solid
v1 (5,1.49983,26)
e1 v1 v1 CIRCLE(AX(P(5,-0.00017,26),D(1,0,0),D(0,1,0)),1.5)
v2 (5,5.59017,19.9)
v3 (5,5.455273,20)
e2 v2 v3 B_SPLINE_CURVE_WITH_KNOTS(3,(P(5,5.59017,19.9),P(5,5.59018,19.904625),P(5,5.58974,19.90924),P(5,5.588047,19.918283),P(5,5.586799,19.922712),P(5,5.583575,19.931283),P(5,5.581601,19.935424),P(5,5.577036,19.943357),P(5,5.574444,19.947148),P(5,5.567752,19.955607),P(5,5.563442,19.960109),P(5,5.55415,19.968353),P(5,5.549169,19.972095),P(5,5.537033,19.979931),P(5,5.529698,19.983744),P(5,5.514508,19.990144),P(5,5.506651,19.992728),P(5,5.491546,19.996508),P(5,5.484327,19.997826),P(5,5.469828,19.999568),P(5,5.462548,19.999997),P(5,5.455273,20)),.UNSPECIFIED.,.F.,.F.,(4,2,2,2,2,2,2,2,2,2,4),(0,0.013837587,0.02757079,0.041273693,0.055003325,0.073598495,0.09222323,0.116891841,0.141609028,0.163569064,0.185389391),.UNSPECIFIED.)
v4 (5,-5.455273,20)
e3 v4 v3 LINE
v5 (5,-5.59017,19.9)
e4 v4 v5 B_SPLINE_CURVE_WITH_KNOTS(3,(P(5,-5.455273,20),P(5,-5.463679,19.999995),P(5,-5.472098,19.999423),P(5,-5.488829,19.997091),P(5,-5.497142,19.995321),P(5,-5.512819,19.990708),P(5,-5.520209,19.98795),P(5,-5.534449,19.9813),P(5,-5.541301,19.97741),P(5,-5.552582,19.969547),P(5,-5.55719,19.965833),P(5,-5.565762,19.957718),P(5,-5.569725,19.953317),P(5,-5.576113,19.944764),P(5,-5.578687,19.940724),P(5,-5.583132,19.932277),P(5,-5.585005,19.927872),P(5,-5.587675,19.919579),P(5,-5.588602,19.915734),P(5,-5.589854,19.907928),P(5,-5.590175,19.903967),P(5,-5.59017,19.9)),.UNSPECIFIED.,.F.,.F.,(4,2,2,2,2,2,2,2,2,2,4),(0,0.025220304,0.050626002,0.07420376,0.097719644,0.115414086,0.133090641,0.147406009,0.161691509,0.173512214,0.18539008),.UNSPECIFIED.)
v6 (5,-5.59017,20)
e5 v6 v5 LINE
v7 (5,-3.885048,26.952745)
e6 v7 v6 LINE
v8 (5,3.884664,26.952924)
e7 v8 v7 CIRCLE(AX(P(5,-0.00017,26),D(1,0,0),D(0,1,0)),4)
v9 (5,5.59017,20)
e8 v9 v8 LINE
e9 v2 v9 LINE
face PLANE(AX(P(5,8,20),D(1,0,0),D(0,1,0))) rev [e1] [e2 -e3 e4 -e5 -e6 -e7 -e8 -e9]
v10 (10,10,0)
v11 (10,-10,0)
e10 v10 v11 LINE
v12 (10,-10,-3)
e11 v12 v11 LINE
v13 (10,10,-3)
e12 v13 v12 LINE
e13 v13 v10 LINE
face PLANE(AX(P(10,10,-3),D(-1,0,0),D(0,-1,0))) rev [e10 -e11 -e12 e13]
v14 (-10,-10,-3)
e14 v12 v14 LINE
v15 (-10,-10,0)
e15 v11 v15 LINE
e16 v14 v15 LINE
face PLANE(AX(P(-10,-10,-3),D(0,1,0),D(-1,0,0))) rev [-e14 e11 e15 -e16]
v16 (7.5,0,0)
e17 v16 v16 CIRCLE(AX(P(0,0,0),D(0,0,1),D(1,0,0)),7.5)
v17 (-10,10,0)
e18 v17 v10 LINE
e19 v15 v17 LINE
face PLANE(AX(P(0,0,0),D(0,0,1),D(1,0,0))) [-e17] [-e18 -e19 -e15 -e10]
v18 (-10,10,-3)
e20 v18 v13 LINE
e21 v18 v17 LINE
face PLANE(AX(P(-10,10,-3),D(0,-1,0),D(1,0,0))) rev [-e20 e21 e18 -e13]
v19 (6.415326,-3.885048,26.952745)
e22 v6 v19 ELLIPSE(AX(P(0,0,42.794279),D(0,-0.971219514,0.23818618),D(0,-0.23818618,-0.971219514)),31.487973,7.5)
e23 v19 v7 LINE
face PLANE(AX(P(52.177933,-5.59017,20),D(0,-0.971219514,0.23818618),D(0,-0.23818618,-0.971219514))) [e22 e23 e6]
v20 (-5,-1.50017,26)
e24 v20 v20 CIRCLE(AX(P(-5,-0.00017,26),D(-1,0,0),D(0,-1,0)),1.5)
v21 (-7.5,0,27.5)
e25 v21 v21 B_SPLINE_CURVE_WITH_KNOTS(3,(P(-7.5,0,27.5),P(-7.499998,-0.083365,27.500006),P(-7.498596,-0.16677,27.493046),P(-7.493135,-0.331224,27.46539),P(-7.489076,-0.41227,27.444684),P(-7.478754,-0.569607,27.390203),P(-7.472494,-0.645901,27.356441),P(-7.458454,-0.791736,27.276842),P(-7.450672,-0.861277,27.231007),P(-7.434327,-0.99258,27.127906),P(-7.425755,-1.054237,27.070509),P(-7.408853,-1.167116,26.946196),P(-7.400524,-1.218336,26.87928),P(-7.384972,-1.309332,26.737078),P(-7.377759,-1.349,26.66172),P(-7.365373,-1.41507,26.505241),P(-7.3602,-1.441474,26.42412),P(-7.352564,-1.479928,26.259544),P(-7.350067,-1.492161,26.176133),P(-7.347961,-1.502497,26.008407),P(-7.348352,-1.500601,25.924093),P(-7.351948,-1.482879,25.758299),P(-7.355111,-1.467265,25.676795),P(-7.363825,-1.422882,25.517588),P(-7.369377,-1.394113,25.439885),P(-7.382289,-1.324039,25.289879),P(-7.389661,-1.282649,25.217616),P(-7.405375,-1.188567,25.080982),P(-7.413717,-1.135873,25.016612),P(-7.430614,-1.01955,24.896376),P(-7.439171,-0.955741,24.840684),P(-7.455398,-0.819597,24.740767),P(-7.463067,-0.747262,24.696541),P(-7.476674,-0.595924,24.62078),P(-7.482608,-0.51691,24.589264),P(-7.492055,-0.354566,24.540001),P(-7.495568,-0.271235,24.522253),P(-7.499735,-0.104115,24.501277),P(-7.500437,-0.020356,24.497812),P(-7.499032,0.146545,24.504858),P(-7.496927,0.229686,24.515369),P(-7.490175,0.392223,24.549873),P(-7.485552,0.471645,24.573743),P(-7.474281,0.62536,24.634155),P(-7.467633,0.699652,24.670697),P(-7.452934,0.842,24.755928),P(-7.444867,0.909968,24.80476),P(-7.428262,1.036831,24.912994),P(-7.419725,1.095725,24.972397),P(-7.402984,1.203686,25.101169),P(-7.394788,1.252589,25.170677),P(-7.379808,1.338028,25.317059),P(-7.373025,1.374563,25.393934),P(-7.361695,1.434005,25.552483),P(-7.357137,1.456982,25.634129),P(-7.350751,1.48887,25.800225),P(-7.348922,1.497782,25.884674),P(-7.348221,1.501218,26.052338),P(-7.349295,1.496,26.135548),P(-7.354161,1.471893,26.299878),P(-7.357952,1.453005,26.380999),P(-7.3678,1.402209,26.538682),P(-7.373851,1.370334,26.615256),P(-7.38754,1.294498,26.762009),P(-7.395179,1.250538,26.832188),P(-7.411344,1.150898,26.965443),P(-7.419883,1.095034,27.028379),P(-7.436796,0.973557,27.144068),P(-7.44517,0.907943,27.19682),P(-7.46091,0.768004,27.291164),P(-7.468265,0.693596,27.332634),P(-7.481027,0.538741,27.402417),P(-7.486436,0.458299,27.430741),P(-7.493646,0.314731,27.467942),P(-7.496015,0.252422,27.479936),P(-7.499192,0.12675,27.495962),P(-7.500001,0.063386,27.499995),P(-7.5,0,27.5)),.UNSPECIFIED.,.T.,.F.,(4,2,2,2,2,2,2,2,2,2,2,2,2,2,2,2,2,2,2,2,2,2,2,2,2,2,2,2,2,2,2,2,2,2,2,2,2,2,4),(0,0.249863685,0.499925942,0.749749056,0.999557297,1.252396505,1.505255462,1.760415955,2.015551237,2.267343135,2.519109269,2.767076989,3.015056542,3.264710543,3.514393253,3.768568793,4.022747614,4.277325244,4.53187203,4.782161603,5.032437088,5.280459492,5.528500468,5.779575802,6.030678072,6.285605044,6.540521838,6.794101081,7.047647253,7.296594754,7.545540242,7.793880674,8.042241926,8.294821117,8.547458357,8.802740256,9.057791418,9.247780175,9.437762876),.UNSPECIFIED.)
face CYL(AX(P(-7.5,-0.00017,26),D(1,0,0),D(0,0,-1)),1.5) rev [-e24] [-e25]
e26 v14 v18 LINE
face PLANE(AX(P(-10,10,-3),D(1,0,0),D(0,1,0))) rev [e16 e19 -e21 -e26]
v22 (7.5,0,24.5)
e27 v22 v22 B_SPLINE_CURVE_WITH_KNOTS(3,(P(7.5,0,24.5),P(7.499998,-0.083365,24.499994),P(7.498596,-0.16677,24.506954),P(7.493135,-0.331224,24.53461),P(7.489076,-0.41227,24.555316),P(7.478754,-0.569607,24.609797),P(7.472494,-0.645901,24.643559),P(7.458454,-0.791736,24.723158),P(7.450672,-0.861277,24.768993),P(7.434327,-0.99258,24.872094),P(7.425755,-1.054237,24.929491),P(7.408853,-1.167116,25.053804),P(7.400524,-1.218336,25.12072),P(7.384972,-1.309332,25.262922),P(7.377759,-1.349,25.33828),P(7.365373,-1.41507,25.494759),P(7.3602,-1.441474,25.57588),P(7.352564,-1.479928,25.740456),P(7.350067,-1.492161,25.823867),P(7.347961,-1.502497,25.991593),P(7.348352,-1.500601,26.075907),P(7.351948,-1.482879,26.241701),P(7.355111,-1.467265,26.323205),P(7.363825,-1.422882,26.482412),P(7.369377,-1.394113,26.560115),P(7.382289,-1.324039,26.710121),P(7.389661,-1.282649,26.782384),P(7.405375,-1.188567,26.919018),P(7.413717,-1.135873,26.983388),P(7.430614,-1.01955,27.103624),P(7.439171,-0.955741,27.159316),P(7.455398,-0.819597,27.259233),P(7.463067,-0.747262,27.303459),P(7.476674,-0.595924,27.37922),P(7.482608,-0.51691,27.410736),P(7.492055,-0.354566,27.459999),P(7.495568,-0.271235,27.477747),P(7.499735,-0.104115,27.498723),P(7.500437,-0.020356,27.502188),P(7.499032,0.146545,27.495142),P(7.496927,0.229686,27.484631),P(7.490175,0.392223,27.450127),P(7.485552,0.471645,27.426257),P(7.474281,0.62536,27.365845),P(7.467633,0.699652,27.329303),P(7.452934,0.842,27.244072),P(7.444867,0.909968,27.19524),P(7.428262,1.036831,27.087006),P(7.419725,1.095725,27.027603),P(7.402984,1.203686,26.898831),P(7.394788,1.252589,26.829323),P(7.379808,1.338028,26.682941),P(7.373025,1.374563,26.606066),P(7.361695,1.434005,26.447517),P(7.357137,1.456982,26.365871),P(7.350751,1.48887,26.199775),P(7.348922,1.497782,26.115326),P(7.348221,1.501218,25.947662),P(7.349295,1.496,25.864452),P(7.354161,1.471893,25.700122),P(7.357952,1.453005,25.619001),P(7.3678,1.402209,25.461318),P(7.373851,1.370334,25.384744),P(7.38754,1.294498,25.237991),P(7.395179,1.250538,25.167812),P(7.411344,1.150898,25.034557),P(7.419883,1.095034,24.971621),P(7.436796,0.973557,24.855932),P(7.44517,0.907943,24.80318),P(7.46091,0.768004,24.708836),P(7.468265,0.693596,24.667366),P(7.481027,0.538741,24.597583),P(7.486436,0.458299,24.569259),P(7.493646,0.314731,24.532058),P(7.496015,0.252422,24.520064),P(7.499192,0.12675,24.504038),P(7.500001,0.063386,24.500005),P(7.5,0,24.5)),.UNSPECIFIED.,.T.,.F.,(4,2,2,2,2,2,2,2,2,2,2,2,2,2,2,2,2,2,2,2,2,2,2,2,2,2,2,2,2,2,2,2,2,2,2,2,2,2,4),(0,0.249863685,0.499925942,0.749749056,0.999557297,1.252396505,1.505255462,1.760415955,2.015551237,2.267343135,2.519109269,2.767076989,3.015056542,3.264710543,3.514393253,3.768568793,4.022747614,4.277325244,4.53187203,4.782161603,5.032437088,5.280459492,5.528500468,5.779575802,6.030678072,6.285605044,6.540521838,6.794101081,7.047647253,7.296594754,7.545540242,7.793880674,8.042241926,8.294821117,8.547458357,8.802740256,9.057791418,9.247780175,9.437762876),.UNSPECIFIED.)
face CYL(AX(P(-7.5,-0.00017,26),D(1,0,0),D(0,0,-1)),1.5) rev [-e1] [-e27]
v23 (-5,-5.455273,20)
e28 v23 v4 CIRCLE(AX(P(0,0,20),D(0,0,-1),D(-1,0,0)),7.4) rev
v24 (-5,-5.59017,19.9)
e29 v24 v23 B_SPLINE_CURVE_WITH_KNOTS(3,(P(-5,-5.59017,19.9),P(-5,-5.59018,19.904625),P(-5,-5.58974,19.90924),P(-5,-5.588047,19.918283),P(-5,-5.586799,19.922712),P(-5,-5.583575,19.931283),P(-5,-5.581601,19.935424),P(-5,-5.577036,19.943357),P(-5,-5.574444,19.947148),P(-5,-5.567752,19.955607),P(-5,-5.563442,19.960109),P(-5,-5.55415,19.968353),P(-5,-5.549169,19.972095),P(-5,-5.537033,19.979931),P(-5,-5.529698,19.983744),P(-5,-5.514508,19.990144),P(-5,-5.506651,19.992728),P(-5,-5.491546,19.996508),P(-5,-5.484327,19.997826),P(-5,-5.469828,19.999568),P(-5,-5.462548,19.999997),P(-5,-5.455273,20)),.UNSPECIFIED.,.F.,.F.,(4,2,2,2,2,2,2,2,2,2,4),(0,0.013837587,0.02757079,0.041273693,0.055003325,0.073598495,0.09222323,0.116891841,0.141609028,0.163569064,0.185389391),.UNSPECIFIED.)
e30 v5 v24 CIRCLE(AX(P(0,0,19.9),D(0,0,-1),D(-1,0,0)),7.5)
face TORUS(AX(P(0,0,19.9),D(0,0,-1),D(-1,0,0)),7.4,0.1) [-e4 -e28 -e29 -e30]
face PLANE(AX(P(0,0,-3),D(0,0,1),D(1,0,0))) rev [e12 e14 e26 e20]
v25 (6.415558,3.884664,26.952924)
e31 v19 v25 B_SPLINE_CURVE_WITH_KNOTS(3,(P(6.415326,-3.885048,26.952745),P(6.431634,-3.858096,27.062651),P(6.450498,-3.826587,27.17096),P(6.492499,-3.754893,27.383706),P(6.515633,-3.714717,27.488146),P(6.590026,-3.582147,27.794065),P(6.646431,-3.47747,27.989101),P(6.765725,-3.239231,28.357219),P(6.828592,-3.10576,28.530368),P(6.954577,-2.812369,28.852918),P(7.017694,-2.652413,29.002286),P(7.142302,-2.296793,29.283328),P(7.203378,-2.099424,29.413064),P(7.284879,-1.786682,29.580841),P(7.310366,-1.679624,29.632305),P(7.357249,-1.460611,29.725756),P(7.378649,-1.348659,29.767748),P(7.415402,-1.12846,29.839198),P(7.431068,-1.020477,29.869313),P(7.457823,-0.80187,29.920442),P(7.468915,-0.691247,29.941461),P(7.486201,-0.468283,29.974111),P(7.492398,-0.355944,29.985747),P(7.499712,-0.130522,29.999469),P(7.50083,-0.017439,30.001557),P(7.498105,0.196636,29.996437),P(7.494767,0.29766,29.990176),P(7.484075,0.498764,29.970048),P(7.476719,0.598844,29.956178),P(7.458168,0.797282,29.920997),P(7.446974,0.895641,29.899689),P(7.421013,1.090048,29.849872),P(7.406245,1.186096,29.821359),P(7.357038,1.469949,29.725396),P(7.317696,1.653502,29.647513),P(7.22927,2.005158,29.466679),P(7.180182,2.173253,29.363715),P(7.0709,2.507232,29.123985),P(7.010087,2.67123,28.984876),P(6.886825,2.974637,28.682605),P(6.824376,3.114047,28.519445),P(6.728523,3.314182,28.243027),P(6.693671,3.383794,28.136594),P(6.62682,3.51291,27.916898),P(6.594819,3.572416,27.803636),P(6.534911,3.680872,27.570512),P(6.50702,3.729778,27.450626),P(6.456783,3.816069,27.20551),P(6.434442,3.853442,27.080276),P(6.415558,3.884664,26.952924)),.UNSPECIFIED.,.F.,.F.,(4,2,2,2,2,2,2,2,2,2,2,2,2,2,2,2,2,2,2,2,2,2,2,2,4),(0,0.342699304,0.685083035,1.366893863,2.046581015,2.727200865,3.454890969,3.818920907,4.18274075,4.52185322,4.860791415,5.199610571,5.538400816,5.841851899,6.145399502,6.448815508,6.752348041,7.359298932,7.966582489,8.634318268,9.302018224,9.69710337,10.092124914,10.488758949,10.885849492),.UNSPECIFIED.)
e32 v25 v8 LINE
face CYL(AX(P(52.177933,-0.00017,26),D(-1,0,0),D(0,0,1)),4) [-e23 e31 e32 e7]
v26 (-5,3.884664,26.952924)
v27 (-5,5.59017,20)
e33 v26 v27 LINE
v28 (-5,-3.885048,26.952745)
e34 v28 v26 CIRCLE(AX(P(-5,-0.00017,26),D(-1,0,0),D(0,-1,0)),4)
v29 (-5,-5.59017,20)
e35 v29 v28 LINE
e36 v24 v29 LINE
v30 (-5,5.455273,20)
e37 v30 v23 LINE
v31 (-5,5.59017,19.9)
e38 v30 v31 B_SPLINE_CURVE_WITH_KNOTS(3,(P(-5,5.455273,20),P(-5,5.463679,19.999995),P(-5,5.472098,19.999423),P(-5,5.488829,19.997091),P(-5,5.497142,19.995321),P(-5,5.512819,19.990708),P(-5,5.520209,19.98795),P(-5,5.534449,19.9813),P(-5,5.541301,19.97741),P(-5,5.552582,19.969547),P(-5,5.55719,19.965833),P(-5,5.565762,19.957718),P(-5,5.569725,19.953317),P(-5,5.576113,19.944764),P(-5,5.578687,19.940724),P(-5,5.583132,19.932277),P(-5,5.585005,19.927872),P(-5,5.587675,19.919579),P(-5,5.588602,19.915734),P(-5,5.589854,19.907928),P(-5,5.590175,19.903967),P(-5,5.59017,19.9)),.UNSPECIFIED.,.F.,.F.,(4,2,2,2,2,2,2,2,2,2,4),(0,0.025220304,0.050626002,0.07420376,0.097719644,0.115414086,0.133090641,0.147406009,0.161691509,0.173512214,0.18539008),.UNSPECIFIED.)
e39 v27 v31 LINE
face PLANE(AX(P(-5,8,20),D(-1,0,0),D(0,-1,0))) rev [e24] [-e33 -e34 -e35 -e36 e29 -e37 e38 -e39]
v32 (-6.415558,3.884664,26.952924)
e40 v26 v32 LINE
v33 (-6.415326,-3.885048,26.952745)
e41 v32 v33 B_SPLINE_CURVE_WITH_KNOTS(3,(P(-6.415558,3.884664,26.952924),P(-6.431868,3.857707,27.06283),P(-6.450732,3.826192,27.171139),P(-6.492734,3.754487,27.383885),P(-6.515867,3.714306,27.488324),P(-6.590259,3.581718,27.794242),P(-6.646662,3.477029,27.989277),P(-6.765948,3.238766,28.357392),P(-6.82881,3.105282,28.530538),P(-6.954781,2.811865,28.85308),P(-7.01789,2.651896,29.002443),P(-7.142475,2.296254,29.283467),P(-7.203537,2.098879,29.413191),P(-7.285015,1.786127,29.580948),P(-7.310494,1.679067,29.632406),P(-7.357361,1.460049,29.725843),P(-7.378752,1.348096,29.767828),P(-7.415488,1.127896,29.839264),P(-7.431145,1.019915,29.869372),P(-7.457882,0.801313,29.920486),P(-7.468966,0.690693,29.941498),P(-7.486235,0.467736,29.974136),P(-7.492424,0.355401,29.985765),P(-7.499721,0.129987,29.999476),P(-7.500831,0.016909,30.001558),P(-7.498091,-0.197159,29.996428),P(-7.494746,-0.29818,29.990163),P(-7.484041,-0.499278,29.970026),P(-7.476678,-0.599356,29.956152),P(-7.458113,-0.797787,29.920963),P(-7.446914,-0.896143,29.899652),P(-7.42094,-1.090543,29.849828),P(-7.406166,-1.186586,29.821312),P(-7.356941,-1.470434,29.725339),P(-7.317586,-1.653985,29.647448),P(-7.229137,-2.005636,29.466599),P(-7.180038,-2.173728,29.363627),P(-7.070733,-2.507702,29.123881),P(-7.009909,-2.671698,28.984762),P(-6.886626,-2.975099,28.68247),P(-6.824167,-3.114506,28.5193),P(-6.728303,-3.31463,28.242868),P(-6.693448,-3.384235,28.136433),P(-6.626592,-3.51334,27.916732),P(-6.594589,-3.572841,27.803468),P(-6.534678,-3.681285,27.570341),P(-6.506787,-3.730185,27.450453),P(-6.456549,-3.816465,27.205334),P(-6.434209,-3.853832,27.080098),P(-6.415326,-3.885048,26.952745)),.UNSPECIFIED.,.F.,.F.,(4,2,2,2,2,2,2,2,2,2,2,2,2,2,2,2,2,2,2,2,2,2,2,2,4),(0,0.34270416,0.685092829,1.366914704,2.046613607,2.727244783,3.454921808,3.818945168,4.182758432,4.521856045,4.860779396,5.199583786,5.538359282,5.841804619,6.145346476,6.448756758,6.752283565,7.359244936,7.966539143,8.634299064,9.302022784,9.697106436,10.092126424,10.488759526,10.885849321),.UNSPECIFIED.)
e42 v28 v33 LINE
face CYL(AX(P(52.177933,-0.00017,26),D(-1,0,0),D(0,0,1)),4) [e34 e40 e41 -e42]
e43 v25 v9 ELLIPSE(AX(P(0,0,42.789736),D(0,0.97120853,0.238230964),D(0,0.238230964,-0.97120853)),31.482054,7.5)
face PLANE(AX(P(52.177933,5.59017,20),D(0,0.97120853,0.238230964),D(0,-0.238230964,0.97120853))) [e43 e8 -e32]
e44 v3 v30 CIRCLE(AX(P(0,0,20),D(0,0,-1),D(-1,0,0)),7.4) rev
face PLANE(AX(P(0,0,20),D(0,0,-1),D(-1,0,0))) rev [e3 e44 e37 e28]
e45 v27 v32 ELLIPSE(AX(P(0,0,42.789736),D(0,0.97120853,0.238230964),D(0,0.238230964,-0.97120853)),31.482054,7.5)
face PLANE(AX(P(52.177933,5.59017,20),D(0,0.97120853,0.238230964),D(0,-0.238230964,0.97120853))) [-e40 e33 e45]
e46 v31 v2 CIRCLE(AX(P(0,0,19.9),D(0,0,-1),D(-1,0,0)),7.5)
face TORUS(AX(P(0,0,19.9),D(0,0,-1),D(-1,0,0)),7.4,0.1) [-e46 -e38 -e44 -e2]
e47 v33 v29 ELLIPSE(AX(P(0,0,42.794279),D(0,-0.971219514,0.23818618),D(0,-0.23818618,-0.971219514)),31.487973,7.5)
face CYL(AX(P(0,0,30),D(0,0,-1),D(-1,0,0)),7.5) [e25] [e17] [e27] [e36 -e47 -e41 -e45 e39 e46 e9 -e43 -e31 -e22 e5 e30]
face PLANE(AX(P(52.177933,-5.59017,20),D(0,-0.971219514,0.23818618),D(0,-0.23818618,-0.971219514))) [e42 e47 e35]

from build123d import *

# Parameters (mm, degrees)
SKETCH1_R               = 7.5
BOSS_EXTRUDE1_DEPTH     = 30
SKETCH3_W               = 10
SKETCH3_H               = 16
CUT_EXTRUDE2_DEPTH      = 10
CUT_EXTRUDE3_DEPTH      = 32.819805153
CUT_EXTRUDE3_DEPTH_BACK = 32.819805153
CUT_EXTRUDE4_DEPTH      = 32.819805295
CUT_EXTRUDE4_DEPTH_BACK = 32.819805295
SKETCH5_R               = 1.5
FILLET1_R               = 0.1
SKETCH6_W               = 20
SKETCH6_H               = 20
BOSS_EXTRUDE2_DEPTH     = 3


with BuildPart() as part:
    # Sketch1 → Boss-Extrude1 (new body)
    with BuildSketch(Plane.XY):
        Circle(SKETCH1_R)
    extrude(amount=BOSS_EXTRUDE1_DEPTH)

    # Sketch3 → Cut-Extrude2 (cut)
    with BuildSketch(Plane.XY.offset(30)):
        Rectangle(SKETCH3_W, SKETCH3_H)
    extrude(amount=-CUT_EXTRUDE2_DEPTH, mode=Mode.SUBTRACT)

    # Sketch4 → Cut-Extrude3 (cut, two sides: drawn at the far end of the back side and taken through both)
    with BuildSketch(Plane(origin=(0, 0, 0), x_dir=(0, 0, -1), z_dir=(1, 0, 0)).offset(-CUT_EXTRUDE3_DEPTH_BACK)):
        with BuildLine():
            Line((-20, 67.5), (-20, 7.5))
            Line((-20, 7.5), (-20, 5.590169944))
            Line((-20, 5.590169944), (-26.952923855, 3.884664175))
            ThreePointArc((-26.952923855, 3.884664175), (-29.999999999, -0.000262165), (-26.952744721, -3.885047998))
            Line((-26.952744721, -3.885047998), (-20, -5.590169944))
            Line((-20, -5.590169944), (-20, -7.5))
            Line((-20, -7.5), (-20, -67.5))
            Line((-20, -67.5), (-140, -67.5))
            Line((-140, -67.5), (-140, 67.5))
            Line((-140, 67.5), (-20, 67.5))
        make_face()
    extrude(amount=CUT_EXTRUDE3_DEPTH + CUT_EXTRUDE3_DEPTH_BACK, mode=Mode.SUBTRACT)

    # Sketch5 → Cut-Extrude4 (cut, two sides: drawn at the far end of the back side and taken through both)
    with BuildSketch(Plane(origin=(0, 0, 0), x_dir=(0, 0, -1), z_dir=(1, 0, 0)).offset(-CUT_EXTRUDE4_DEPTH_BACK)):
        with Locations(Location((-26, -0.000169944, 0), (0, 0, 0.006491373))):
            Circle(SKETCH5_R)
    extrude(amount=CUT_EXTRUDE4_DEPTH + CUT_EXTRUDE4_DEPTH_BACK, mode=Mode.SUBTRACT)

    # Fillet1
    # the kernel refuses this fillet: 0.1 mm, written as the material it takes off along each edge
    with BuildSketch(Plane(origin=(0, 0, 20), x_dir=(0.6911452834399253, -0.7227158481580055, 0), z_dir=(0.7227158481580055, 0.6911452834399253, 0))) as fillet1_piece_1_section:
        with BuildLine():
            CenterArc((7.5 - FILLET1_R, FILLET1_R), FILLET1_R, 270, 90)
            Line((7.5 - FILLET1_R, 0), (7.5, 0))
            Line((7.5, 0), (7.5, FILLET1_R))
        make_face()
    fillet1_piece_1 = revolve(axis=Axis((0, 0, 20), (0, 0, -1)), revolution_arc=87.441672972, mode=Mode.PRIVATE)
    fillet1_piece_1 = split(fillet1_piece_1, bisect_by=Plane(origin=(5, -5.569278589, 19.983070115), z_dir=(-1, 0, 0)), keep=Keep.TOP, mode=Mode.PRIVATE)
    fillet1_piece_1 = split(fillet1_piece_1, bisect_by=Plane(origin=(-5, -5.569278589, 19.983070115), z_dir=(1, 0, 0)), keep=Keep.TOP, mode=Mode.PRIVATE)
    add(fillet1_piece_1, mode=Mode.SUBTRACT)
    with BuildSketch(Plane(origin=(0, 0, 20), x_dir=(-0.6911452834399255, 0.7227158481580054, 0), z_dir=(-0.7227158481580054, -0.6911452834399255, 0))) as fillet1_piece_2_section:
        with BuildLine():
            CenterArc((7.5 - FILLET1_R, FILLET1_R), FILLET1_R, 270, 90)
            Line((7.5 - FILLET1_R, 0), (7.5, 0))
            Line((7.5, 0), (7.5, FILLET1_R))
        make_face()
    fillet1_piece_2 = revolve(axis=Axis((0, 0, 20), (0, 0, -1)), revolution_arc=87.441672972, mode=Mode.PRIVATE)
    fillet1_piece_2 = split(fillet1_piece_2, bisect_by=Plane(origin=(5, 5.569279486, 19.983069507), z_dir=(-1, 0, 0)), keep=Keep.TOP, mode=Mode.PRIVATE)
    fillet1_piece_2 = split(fillet1_piece_2, bisect_by=Plane(origin=(-5, 5.569279486, 19.983069507), z_dir=(1, 0, 0)), keep=Keep.TOP, mode=Mode.PRIVATE)
    add(fillet1_piece_2, mode=Mode.SUBTRACT)

    # Sketch6 → Boss-Extrude2 (add)
    with BuildSketch(Plane(origin=(0, 0, 0), x_dir=(-1, 0, 0), z_dir=(0, 0, -1))):
        Rectangle(SKETCH6_W, SKETCH6_H)
    extrude(amount=BOSS_EXTRUDE2_DEPTH)


solid = part.part
